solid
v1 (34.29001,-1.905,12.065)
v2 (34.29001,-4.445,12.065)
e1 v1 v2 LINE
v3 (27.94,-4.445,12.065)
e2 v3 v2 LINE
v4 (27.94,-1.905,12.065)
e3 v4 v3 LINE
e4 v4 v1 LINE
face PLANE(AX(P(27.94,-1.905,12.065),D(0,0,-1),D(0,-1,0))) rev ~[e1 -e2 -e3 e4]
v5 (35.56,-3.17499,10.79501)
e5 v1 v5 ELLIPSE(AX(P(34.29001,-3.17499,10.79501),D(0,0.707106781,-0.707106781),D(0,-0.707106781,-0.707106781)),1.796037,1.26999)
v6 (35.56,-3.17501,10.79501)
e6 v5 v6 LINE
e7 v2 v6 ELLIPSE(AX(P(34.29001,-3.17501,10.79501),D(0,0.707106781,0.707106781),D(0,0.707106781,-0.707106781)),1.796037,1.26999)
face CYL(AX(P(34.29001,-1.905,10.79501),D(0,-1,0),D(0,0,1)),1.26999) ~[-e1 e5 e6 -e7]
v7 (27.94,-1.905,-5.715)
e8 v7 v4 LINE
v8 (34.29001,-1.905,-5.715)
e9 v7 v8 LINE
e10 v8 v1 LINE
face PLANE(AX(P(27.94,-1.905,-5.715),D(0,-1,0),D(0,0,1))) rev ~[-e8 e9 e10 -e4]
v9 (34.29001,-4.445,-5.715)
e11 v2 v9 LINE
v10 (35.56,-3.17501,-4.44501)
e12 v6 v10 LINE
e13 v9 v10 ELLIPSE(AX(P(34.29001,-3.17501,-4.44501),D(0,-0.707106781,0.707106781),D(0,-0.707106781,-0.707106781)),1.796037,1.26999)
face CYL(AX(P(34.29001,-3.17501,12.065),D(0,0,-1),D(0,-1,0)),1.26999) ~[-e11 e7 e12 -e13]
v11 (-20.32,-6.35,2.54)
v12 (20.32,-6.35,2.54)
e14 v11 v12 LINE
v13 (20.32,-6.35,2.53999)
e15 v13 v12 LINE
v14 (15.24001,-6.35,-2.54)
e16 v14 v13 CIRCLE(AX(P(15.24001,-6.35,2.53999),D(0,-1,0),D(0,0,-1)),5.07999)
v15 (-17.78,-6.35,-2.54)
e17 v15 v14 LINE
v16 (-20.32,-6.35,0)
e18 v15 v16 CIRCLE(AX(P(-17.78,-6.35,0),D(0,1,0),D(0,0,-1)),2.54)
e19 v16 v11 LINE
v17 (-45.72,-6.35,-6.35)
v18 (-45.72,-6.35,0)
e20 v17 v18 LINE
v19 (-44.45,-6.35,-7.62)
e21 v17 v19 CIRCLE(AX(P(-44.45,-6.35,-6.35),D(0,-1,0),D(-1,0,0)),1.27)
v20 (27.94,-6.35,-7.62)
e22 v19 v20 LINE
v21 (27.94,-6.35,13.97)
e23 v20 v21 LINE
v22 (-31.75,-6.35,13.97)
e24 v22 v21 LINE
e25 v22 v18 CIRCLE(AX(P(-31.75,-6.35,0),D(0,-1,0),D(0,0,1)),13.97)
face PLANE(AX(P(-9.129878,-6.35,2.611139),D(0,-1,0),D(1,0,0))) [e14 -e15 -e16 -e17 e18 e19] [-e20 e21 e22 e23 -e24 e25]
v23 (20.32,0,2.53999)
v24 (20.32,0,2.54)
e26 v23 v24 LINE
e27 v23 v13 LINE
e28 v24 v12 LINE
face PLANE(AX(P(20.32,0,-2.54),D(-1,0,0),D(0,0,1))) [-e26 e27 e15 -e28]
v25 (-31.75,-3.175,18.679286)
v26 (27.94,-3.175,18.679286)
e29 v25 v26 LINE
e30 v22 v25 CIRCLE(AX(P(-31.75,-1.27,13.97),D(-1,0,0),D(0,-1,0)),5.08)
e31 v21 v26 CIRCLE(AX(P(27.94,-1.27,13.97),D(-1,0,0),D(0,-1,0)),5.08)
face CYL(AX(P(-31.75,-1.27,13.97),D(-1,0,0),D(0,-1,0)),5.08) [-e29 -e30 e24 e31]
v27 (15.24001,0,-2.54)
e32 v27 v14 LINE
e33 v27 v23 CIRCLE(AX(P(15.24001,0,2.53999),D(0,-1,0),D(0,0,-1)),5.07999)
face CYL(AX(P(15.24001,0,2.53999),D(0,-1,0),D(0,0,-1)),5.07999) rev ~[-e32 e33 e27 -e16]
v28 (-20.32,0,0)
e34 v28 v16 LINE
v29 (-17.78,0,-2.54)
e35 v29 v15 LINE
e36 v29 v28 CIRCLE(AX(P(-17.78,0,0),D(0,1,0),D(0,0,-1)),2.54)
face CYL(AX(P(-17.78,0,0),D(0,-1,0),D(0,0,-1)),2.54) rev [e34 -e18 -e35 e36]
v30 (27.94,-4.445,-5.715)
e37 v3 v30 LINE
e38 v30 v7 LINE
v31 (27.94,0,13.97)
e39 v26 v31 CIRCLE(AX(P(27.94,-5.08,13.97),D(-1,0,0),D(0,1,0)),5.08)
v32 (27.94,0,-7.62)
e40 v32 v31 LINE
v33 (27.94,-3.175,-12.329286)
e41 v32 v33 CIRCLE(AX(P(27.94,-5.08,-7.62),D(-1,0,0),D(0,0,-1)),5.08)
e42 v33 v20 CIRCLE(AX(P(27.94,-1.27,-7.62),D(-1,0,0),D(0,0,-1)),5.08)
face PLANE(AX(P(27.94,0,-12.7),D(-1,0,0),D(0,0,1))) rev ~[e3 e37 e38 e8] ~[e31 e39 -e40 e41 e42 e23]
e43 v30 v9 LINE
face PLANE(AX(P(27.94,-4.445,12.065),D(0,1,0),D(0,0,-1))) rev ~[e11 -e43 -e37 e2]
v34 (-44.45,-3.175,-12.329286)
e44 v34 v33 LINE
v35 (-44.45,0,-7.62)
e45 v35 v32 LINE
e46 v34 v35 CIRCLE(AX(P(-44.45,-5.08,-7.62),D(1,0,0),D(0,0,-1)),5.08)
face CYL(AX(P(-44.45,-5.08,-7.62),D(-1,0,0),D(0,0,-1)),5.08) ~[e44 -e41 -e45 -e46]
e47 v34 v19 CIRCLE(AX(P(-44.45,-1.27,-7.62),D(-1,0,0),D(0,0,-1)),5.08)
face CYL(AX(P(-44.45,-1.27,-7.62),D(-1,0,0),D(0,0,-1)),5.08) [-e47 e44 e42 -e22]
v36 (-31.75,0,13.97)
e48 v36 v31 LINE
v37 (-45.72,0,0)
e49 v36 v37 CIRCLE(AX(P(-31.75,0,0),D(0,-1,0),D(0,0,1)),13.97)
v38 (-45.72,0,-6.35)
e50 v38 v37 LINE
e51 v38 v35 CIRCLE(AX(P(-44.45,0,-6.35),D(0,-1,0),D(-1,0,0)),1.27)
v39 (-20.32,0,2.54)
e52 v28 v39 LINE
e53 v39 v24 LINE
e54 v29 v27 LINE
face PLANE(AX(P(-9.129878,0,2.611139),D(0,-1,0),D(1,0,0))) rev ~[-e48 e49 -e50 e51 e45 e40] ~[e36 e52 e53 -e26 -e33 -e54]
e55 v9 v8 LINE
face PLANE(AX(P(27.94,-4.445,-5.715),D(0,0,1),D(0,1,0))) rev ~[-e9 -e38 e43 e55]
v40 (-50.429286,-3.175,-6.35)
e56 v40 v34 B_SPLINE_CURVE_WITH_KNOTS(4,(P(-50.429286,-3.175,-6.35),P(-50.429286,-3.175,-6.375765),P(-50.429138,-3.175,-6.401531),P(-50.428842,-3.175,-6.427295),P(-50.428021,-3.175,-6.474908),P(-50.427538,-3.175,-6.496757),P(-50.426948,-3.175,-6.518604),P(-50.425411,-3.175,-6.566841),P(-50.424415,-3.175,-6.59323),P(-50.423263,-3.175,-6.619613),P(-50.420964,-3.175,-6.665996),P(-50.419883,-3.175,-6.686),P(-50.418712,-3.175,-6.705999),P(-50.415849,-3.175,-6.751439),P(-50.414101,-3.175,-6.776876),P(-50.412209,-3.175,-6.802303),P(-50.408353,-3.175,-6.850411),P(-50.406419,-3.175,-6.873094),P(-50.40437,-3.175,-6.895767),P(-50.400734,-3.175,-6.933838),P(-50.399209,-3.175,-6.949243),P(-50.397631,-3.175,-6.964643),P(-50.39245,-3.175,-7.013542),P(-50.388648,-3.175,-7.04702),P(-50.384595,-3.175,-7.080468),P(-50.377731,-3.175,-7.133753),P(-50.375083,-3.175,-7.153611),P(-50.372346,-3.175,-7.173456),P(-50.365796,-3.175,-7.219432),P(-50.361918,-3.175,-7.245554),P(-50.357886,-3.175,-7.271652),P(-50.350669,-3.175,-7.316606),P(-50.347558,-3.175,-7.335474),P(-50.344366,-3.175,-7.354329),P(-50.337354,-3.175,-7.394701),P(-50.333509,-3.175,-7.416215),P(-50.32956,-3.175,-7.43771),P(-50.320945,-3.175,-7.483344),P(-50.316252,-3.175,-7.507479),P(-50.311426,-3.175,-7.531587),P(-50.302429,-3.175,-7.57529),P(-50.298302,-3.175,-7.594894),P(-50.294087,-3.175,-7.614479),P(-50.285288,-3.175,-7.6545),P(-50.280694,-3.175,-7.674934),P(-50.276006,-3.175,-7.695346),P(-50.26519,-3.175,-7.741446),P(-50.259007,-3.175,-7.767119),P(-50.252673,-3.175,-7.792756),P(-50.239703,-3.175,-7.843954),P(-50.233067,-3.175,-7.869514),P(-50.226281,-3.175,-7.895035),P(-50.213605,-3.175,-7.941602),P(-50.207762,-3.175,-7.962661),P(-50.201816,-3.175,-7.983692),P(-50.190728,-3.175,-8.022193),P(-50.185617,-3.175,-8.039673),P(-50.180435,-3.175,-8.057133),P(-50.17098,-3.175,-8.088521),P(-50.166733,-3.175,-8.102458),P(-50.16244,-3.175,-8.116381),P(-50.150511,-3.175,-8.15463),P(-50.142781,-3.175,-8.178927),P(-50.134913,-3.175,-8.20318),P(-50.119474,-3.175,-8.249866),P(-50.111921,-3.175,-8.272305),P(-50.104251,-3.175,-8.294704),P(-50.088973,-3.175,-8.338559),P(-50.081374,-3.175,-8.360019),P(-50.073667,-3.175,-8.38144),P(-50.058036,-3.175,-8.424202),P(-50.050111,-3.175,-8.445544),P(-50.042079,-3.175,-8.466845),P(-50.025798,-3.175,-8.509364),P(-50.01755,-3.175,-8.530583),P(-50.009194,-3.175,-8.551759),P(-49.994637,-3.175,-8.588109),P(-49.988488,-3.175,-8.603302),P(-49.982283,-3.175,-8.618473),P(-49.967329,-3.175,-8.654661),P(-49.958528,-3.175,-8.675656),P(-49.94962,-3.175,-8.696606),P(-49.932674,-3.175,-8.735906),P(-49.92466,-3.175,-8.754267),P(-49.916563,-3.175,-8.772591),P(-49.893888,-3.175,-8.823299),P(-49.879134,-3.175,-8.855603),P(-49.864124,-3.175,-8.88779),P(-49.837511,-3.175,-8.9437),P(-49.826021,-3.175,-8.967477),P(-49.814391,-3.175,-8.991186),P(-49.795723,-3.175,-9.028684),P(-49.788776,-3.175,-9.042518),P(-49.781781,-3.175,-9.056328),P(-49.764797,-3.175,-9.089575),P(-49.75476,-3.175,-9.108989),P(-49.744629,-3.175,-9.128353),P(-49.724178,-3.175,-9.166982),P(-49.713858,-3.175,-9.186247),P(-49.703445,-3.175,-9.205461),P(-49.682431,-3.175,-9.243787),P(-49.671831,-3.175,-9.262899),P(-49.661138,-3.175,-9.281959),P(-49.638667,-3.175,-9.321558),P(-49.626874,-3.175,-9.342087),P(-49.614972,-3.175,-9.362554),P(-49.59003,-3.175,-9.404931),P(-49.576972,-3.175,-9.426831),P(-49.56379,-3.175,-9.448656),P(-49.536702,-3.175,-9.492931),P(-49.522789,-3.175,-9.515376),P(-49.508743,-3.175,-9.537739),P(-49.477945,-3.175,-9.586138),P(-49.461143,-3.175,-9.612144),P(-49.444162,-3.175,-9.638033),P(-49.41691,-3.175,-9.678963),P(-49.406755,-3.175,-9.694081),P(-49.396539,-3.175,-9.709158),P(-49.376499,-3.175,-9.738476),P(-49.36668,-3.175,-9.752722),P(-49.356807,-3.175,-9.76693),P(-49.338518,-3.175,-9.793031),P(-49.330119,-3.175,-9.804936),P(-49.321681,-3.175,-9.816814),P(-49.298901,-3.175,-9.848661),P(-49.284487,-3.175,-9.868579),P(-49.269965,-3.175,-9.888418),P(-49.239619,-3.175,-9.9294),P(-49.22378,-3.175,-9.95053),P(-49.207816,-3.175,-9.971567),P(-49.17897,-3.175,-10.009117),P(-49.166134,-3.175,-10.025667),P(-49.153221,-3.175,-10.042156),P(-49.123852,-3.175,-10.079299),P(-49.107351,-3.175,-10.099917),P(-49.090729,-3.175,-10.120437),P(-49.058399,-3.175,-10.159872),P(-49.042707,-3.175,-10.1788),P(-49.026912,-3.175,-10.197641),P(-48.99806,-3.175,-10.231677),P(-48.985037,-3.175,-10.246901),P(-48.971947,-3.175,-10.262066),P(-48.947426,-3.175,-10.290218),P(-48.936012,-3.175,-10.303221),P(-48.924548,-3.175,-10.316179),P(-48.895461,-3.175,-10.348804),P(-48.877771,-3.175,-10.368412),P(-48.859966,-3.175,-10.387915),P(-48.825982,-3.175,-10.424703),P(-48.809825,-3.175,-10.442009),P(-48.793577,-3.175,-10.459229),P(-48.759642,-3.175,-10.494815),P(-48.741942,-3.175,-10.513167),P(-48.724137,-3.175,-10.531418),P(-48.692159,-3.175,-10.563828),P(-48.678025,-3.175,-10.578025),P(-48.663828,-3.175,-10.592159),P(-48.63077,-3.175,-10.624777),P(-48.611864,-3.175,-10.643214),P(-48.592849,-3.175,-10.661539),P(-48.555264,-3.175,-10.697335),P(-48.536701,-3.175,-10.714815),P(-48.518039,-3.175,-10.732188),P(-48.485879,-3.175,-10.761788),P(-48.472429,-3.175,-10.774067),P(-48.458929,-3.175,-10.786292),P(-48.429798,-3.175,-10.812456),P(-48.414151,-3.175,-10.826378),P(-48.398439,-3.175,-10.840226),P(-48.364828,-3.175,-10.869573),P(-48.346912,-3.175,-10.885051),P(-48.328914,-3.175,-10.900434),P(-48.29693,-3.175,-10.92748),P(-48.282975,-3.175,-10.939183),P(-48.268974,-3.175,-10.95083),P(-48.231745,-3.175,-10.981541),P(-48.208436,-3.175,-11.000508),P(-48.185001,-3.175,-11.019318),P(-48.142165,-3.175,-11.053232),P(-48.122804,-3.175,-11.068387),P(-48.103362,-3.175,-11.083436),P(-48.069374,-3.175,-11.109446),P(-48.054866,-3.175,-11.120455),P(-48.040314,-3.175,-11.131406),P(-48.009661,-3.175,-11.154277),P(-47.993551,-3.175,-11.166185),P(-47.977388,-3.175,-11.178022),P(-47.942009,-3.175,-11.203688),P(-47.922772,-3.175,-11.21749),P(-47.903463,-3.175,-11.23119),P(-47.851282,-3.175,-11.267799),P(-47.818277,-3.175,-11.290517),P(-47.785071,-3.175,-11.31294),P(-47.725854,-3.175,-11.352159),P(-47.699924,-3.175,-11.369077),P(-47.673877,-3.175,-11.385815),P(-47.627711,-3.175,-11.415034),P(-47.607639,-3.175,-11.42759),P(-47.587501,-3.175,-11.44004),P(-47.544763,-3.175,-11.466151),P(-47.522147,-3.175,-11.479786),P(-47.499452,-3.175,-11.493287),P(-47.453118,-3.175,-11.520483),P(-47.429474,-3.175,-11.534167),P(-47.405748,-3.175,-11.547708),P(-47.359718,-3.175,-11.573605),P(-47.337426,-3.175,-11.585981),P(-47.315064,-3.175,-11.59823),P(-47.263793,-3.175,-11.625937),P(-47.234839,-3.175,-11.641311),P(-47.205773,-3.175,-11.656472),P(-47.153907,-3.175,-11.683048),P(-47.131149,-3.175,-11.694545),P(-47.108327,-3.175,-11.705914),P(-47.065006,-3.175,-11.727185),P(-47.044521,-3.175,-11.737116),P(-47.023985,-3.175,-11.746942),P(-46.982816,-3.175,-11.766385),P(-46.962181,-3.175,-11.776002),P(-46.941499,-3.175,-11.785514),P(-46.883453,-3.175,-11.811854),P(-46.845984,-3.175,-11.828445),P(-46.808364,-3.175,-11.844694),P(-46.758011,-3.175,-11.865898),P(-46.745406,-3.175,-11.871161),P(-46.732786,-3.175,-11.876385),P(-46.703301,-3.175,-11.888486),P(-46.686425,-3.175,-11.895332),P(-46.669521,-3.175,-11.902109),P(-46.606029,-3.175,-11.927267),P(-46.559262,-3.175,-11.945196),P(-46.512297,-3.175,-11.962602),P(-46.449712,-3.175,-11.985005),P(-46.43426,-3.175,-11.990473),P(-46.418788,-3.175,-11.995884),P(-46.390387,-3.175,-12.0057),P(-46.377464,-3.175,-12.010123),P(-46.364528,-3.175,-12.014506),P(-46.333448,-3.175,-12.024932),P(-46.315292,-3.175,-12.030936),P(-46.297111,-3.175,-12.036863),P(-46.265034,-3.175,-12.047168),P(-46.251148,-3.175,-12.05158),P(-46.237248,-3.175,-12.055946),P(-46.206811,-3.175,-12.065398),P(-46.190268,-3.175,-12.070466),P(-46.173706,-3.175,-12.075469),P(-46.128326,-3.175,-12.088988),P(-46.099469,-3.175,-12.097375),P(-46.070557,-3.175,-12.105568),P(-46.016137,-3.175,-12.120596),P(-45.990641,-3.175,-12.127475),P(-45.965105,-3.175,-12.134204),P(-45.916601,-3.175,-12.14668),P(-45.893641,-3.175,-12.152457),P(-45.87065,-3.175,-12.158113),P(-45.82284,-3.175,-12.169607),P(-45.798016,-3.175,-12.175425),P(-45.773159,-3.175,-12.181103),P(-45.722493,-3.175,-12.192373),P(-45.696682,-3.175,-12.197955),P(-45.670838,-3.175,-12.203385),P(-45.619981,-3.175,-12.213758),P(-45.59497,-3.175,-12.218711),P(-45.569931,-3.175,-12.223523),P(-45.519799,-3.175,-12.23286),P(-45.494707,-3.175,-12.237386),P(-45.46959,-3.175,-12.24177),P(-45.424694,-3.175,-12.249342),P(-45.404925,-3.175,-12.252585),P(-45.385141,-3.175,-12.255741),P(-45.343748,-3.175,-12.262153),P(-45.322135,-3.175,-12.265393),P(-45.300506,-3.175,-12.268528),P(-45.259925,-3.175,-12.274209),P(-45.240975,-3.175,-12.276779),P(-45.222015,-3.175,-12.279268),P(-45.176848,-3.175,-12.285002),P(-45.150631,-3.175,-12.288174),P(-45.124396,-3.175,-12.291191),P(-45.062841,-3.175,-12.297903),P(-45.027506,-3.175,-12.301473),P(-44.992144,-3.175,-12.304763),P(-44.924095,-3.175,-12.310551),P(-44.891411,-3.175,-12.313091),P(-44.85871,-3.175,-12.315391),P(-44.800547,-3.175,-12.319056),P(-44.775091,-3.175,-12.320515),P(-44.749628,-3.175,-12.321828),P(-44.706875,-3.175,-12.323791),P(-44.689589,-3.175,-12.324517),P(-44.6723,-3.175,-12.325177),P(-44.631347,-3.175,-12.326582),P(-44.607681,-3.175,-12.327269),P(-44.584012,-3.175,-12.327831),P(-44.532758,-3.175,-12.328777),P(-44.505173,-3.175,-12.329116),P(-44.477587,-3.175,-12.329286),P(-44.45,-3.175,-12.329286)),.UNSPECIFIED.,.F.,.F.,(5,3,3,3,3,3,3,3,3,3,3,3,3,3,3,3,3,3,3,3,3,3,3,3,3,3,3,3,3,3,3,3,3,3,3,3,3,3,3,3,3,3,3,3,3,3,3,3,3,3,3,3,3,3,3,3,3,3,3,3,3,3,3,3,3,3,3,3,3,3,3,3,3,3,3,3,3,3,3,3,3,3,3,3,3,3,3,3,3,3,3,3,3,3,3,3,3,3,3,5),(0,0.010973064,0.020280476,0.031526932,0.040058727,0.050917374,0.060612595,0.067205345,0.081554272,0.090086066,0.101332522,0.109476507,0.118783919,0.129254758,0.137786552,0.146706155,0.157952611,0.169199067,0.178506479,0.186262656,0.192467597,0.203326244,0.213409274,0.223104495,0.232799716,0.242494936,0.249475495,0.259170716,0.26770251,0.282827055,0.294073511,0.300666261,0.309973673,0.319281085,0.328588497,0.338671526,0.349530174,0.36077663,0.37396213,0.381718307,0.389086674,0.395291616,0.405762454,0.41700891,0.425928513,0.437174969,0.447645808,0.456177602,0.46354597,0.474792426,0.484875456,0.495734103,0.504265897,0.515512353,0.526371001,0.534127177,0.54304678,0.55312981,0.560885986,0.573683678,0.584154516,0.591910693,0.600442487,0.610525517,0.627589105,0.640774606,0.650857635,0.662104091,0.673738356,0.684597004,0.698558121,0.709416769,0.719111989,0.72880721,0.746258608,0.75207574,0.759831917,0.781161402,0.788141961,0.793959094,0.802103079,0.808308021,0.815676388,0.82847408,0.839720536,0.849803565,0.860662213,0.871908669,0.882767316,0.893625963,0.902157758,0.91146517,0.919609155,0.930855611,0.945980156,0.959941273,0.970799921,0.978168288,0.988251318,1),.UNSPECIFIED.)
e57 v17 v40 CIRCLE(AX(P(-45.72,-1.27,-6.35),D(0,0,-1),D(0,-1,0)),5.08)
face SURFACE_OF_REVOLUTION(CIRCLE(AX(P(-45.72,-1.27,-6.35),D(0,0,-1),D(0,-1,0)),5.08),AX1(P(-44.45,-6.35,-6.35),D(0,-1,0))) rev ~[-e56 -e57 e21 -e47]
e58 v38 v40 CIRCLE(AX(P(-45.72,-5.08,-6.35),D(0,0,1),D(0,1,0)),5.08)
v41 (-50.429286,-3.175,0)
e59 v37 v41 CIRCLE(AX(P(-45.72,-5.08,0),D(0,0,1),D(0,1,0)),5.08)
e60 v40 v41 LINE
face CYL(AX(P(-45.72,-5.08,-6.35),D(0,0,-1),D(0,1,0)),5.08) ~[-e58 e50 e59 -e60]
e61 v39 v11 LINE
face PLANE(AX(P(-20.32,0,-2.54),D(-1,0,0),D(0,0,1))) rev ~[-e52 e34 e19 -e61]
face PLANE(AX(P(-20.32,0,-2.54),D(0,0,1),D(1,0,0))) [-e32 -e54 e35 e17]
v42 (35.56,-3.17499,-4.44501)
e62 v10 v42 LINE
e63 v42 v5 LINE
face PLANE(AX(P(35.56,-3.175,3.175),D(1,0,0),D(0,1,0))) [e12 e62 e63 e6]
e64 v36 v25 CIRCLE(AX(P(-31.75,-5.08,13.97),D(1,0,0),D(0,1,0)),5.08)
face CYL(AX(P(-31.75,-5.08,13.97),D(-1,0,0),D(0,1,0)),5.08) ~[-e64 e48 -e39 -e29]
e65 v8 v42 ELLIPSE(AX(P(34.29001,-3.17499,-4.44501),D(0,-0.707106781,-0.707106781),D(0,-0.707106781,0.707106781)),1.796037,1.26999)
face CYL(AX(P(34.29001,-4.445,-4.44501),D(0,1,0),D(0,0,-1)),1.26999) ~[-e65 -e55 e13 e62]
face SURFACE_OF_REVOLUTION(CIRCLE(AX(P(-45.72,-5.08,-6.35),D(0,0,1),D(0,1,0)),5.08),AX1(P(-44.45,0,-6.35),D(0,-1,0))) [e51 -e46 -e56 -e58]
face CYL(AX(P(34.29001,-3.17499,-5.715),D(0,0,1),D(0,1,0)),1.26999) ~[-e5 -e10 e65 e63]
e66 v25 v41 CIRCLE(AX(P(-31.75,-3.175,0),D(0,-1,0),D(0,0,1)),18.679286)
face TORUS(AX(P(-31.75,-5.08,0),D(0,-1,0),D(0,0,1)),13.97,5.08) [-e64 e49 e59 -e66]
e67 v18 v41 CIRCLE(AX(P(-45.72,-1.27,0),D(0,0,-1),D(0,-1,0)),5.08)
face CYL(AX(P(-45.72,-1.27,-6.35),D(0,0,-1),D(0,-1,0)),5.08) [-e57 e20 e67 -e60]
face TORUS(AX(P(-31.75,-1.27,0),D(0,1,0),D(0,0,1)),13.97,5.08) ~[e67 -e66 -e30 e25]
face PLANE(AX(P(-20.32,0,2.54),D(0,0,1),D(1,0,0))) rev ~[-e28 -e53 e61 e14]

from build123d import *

# Parameters (mm, degrees)
F0_W         = 40.64
F0_H         = 5.08
F1_DEPTH     = 6.35
F3_DEPTH     = 7.62
F4_R         = 1.26999
F5_T1_DEPTH  = 6.35
F5_T3_DEPTH  = 85.09
F5_T5_DEPTH  = 72.39
F5_T8_ANGLE  = 90
F5_T10_ANGLE = 90
F5_T12_ANGLE = 90
F5_T14_ANGLE = 90
F6_R         = 5.07999
F7_R         = 2.54


# Not quite as in the source:
# - a fillet or chamfer that OpenCascade refuses, or shapes differently, is made with other operations: its cross-section is extruded or revolved along the edge and cut away or added
# - a fillet or chamfer is up to 0.001 mm smaller than in the source, because OpenCascade refuses the exact size


with BuildPart() as f1:
    # F0 (on Front) → F1 (new body)
    with BuildSketch(Plane.XZ):
        with BuildLine():
            ThreePointArc((-31.75, 19.05), (-45.2203841816, 13.4703841816), (-50.8, 0))
            Line((-50.8, 0), (-50.8, -6.35))
            ThreePointArc((-50.8, -6.35), (-48.9401280605, -10.8401280605), (-44.45, -12.7))
            Line((-44.45, -12.7), (27.94, -12.7))
            Line((27.94, -12.7), (27.94, 19.05))
            Line((27.94, 19.05), (20.32, 19.05))
            Line((20.32, 19.05), (-31.75, 19.05))
        make_face()
        Rectangle(F0_W, F0_H, mode=Mode.SUBTRACT)
    extrude(amount=F1_DEPTH)

    # F2 (on face) → F3 (join)
    with BuildSketch(Plane.YZ.offset(27.94)):
        Polygon((-4.445, -5.715), (-3.175, -5.715), (-1.905, -5.715), (-1.905, 12.065), (-4.445, 12.065), align=None)
    extrude(amount=F3_DEPTH)

    # F4 (radius 1.27 in the source; OpenCascade refuses exactly that, so slightly less here)
    f4_edges = [f1.edges().sort_by_distance(p)[0] for p in [
        (35.56, -4.445, 3.175),
        (35.56, -3.175, 12.065),
        (35.56, -1.905, 3.175),
        (35.56, -3.175, -5.715),
    ]]
    fillet(f4_edges, radius=F4_R)

    # F5: fillet of radius 5.08 on 2 edges, made by hand

    # F5_s2 → F5_t1 (cut)
    with BuildSketch(Plane.XY.offset(-6.35)):
        with BuildLine():
            ThreePointArc((-45.72, 0), (-49.3121024484, -1.4878975516), (-50.8, -5.08))
            Line((-50.8, -5.08), (-50.8, 0))
            Line((-50.8, 0), (-45.72, 0))
        make_face()
        with BuildLine():
            ThreePointArc((-45.72, -6.35), (-49.3121024484, -4.8621024484), (-50.8, -1.27))
            Line((-50.8, -1.27), (-50.8, -6.35))
            Line((-50.8, -6.35), (-45.72, -6.35))
        make_face()
    extrude(amount=F5_T1_DEPTH, mode=Mode.SUBTRACT)

    # F5_s4 → F5_t3 (cut)
    with BuildSketch(Plane.YZ.offset(-44.45)):
        with BuildLine():
            ThreePointArc((-5.08, -12.7), (-1.4878975516, -11.2121024484), (0, -7.62))
            Line((0, -7.62), (0, -12.7))
            Line((0, -12.7), (-5.08, -12.7))
        make_face()
        with BuildLine():
            ThreePointArc((-1.27, -12.7), (-4.8621024484, -11.2121024484), (-6.35, -7.62))
            Line((-6.35, -7.62), (-6.35, -12.7))
            Line((-6.35, -12.7), (-1.27, -12.7))
        make_face()
    extrude(amount=F5_T3_DEPTH, mode=Mode.SUBTRACT)

    # F5_s6 → F5_t5 (cut)
    with BuildSketch(Plane.YZ.offset(-31.75)):
        with BuildLine():
            ThreePointArc((0, 13.97), (-1.4878975516, 17.5621024484), (-5.08, 19.05))
            Line((-5.08, 19.05), (0, 19.05))
            Line((0, 19.05), (0, 13.97))
        make_face()
        with BuildLine():
            ThreePointArc((-6.35, 13.97), (-4.8621024484, 17.5621024484), (-1.27, 19.05))
            Line((-1.27, 19.05), (-6.35, 19.05))
            Line((-6.35, 19.05), (-6.35, 13.97))
        make_face()
    extrude(amount=F5_T5_DEPTH, mode=Mode.SUBTRACT)

    # F5_s7 → F5_t8 (revolve, cut)
    with BuildSketch(Plane.XY.offset(-6.35)):
        with BuildLine():
            ThreePointArc((-45.72, -6.35), (-49.3121024484, -4.8621024484), (-50.8, -1.27))
            Line((-50.8, -1.27), (-50.8, -6.35))
            Line((-50.8, -6.35), (-45.72, -6.35))
        make_face()
    revolve(axis=Axis((-44.45, -6.35, -6.35), (0, -1, 0)), revolution_arc=F5_T8_ANGLE, mode=Mode.SUBTRACT)

    # F5_s9 → F5_t10 (revolve, cut)
    with BuildSketch(Plane.YZ.offset(-31.75)):
        with BuildLine():
            ThreePointArc((0, 13.97), (-1.4878975516, 17.5621024484), (-5.08, 19.05))
            Line((-5.08, 19.05), (0, 19.05))
            Line((0, 19.05), (0, 13.97))
        make_face()
    revolve(axis=Axis((-31.75, 0, 0), (0, -1, 0)), revolution_arc=F5_T10_ANGLE, mode=Mode.SUBTRACT)

    # F5_s11 → F5_t12 (revolve, cut)
    with BuildSketch(Plane.XY.offset(-6.35)):
        with BuildLine():
            ThreePointArc((-45.72, 0), (-49.3121024484, -1.4878975516), (-50.8, -5.08))
            Line((-50.8, -5.08), (-50.8, 0))
            Line((-50.8, 0), (-45.72, 0))
        make_face()
    revolve(axis=Axis((-44.45, 0, -6.35), (0, -1, 0)), revolution_arc=F5_T12_ANGLE, mode=Mode.SUBTRACT)

    # F5_s13 → F5_t14 (revolve, cut)
    with BuildSketch(Plane.YZ.offset(-31.75)):
        with BuildLine():
            ThreePointArc((-6.35, 13.97), (-4.8621024484, 17.5621024484), (-1.27, 19.05))
            Line((-1.27, 19.05), (-6.35, 19.05))
            Line((-6.35, 19.05), (-6.35, 13.97))
        make_face()
    revolve(axis=Axis((-31.75, -6.35, 0), (0, -1, 0)), revolution_arc=F5_T14_ANGLE, mode=Mode.SUBTRACT)

    # F6 (radius 5.08 in the source; OpenCascade refuses exactly that, so slightly less here)
    f6_edges = [f1.edges().sort_by_distance(p)[0] for p in [
        (20.32, -3.175, -2.54),
    ]]
    fillet(f6_edges, radius=F6_R)

    # F7
    f7_edges = [f1.edges().sort_by_distance(p)[0] for p in [
        (-20.32, -3.175, -2.54),
    ]]
    fillet(f7_edges, radius=F7_R)


solid = f1.part
